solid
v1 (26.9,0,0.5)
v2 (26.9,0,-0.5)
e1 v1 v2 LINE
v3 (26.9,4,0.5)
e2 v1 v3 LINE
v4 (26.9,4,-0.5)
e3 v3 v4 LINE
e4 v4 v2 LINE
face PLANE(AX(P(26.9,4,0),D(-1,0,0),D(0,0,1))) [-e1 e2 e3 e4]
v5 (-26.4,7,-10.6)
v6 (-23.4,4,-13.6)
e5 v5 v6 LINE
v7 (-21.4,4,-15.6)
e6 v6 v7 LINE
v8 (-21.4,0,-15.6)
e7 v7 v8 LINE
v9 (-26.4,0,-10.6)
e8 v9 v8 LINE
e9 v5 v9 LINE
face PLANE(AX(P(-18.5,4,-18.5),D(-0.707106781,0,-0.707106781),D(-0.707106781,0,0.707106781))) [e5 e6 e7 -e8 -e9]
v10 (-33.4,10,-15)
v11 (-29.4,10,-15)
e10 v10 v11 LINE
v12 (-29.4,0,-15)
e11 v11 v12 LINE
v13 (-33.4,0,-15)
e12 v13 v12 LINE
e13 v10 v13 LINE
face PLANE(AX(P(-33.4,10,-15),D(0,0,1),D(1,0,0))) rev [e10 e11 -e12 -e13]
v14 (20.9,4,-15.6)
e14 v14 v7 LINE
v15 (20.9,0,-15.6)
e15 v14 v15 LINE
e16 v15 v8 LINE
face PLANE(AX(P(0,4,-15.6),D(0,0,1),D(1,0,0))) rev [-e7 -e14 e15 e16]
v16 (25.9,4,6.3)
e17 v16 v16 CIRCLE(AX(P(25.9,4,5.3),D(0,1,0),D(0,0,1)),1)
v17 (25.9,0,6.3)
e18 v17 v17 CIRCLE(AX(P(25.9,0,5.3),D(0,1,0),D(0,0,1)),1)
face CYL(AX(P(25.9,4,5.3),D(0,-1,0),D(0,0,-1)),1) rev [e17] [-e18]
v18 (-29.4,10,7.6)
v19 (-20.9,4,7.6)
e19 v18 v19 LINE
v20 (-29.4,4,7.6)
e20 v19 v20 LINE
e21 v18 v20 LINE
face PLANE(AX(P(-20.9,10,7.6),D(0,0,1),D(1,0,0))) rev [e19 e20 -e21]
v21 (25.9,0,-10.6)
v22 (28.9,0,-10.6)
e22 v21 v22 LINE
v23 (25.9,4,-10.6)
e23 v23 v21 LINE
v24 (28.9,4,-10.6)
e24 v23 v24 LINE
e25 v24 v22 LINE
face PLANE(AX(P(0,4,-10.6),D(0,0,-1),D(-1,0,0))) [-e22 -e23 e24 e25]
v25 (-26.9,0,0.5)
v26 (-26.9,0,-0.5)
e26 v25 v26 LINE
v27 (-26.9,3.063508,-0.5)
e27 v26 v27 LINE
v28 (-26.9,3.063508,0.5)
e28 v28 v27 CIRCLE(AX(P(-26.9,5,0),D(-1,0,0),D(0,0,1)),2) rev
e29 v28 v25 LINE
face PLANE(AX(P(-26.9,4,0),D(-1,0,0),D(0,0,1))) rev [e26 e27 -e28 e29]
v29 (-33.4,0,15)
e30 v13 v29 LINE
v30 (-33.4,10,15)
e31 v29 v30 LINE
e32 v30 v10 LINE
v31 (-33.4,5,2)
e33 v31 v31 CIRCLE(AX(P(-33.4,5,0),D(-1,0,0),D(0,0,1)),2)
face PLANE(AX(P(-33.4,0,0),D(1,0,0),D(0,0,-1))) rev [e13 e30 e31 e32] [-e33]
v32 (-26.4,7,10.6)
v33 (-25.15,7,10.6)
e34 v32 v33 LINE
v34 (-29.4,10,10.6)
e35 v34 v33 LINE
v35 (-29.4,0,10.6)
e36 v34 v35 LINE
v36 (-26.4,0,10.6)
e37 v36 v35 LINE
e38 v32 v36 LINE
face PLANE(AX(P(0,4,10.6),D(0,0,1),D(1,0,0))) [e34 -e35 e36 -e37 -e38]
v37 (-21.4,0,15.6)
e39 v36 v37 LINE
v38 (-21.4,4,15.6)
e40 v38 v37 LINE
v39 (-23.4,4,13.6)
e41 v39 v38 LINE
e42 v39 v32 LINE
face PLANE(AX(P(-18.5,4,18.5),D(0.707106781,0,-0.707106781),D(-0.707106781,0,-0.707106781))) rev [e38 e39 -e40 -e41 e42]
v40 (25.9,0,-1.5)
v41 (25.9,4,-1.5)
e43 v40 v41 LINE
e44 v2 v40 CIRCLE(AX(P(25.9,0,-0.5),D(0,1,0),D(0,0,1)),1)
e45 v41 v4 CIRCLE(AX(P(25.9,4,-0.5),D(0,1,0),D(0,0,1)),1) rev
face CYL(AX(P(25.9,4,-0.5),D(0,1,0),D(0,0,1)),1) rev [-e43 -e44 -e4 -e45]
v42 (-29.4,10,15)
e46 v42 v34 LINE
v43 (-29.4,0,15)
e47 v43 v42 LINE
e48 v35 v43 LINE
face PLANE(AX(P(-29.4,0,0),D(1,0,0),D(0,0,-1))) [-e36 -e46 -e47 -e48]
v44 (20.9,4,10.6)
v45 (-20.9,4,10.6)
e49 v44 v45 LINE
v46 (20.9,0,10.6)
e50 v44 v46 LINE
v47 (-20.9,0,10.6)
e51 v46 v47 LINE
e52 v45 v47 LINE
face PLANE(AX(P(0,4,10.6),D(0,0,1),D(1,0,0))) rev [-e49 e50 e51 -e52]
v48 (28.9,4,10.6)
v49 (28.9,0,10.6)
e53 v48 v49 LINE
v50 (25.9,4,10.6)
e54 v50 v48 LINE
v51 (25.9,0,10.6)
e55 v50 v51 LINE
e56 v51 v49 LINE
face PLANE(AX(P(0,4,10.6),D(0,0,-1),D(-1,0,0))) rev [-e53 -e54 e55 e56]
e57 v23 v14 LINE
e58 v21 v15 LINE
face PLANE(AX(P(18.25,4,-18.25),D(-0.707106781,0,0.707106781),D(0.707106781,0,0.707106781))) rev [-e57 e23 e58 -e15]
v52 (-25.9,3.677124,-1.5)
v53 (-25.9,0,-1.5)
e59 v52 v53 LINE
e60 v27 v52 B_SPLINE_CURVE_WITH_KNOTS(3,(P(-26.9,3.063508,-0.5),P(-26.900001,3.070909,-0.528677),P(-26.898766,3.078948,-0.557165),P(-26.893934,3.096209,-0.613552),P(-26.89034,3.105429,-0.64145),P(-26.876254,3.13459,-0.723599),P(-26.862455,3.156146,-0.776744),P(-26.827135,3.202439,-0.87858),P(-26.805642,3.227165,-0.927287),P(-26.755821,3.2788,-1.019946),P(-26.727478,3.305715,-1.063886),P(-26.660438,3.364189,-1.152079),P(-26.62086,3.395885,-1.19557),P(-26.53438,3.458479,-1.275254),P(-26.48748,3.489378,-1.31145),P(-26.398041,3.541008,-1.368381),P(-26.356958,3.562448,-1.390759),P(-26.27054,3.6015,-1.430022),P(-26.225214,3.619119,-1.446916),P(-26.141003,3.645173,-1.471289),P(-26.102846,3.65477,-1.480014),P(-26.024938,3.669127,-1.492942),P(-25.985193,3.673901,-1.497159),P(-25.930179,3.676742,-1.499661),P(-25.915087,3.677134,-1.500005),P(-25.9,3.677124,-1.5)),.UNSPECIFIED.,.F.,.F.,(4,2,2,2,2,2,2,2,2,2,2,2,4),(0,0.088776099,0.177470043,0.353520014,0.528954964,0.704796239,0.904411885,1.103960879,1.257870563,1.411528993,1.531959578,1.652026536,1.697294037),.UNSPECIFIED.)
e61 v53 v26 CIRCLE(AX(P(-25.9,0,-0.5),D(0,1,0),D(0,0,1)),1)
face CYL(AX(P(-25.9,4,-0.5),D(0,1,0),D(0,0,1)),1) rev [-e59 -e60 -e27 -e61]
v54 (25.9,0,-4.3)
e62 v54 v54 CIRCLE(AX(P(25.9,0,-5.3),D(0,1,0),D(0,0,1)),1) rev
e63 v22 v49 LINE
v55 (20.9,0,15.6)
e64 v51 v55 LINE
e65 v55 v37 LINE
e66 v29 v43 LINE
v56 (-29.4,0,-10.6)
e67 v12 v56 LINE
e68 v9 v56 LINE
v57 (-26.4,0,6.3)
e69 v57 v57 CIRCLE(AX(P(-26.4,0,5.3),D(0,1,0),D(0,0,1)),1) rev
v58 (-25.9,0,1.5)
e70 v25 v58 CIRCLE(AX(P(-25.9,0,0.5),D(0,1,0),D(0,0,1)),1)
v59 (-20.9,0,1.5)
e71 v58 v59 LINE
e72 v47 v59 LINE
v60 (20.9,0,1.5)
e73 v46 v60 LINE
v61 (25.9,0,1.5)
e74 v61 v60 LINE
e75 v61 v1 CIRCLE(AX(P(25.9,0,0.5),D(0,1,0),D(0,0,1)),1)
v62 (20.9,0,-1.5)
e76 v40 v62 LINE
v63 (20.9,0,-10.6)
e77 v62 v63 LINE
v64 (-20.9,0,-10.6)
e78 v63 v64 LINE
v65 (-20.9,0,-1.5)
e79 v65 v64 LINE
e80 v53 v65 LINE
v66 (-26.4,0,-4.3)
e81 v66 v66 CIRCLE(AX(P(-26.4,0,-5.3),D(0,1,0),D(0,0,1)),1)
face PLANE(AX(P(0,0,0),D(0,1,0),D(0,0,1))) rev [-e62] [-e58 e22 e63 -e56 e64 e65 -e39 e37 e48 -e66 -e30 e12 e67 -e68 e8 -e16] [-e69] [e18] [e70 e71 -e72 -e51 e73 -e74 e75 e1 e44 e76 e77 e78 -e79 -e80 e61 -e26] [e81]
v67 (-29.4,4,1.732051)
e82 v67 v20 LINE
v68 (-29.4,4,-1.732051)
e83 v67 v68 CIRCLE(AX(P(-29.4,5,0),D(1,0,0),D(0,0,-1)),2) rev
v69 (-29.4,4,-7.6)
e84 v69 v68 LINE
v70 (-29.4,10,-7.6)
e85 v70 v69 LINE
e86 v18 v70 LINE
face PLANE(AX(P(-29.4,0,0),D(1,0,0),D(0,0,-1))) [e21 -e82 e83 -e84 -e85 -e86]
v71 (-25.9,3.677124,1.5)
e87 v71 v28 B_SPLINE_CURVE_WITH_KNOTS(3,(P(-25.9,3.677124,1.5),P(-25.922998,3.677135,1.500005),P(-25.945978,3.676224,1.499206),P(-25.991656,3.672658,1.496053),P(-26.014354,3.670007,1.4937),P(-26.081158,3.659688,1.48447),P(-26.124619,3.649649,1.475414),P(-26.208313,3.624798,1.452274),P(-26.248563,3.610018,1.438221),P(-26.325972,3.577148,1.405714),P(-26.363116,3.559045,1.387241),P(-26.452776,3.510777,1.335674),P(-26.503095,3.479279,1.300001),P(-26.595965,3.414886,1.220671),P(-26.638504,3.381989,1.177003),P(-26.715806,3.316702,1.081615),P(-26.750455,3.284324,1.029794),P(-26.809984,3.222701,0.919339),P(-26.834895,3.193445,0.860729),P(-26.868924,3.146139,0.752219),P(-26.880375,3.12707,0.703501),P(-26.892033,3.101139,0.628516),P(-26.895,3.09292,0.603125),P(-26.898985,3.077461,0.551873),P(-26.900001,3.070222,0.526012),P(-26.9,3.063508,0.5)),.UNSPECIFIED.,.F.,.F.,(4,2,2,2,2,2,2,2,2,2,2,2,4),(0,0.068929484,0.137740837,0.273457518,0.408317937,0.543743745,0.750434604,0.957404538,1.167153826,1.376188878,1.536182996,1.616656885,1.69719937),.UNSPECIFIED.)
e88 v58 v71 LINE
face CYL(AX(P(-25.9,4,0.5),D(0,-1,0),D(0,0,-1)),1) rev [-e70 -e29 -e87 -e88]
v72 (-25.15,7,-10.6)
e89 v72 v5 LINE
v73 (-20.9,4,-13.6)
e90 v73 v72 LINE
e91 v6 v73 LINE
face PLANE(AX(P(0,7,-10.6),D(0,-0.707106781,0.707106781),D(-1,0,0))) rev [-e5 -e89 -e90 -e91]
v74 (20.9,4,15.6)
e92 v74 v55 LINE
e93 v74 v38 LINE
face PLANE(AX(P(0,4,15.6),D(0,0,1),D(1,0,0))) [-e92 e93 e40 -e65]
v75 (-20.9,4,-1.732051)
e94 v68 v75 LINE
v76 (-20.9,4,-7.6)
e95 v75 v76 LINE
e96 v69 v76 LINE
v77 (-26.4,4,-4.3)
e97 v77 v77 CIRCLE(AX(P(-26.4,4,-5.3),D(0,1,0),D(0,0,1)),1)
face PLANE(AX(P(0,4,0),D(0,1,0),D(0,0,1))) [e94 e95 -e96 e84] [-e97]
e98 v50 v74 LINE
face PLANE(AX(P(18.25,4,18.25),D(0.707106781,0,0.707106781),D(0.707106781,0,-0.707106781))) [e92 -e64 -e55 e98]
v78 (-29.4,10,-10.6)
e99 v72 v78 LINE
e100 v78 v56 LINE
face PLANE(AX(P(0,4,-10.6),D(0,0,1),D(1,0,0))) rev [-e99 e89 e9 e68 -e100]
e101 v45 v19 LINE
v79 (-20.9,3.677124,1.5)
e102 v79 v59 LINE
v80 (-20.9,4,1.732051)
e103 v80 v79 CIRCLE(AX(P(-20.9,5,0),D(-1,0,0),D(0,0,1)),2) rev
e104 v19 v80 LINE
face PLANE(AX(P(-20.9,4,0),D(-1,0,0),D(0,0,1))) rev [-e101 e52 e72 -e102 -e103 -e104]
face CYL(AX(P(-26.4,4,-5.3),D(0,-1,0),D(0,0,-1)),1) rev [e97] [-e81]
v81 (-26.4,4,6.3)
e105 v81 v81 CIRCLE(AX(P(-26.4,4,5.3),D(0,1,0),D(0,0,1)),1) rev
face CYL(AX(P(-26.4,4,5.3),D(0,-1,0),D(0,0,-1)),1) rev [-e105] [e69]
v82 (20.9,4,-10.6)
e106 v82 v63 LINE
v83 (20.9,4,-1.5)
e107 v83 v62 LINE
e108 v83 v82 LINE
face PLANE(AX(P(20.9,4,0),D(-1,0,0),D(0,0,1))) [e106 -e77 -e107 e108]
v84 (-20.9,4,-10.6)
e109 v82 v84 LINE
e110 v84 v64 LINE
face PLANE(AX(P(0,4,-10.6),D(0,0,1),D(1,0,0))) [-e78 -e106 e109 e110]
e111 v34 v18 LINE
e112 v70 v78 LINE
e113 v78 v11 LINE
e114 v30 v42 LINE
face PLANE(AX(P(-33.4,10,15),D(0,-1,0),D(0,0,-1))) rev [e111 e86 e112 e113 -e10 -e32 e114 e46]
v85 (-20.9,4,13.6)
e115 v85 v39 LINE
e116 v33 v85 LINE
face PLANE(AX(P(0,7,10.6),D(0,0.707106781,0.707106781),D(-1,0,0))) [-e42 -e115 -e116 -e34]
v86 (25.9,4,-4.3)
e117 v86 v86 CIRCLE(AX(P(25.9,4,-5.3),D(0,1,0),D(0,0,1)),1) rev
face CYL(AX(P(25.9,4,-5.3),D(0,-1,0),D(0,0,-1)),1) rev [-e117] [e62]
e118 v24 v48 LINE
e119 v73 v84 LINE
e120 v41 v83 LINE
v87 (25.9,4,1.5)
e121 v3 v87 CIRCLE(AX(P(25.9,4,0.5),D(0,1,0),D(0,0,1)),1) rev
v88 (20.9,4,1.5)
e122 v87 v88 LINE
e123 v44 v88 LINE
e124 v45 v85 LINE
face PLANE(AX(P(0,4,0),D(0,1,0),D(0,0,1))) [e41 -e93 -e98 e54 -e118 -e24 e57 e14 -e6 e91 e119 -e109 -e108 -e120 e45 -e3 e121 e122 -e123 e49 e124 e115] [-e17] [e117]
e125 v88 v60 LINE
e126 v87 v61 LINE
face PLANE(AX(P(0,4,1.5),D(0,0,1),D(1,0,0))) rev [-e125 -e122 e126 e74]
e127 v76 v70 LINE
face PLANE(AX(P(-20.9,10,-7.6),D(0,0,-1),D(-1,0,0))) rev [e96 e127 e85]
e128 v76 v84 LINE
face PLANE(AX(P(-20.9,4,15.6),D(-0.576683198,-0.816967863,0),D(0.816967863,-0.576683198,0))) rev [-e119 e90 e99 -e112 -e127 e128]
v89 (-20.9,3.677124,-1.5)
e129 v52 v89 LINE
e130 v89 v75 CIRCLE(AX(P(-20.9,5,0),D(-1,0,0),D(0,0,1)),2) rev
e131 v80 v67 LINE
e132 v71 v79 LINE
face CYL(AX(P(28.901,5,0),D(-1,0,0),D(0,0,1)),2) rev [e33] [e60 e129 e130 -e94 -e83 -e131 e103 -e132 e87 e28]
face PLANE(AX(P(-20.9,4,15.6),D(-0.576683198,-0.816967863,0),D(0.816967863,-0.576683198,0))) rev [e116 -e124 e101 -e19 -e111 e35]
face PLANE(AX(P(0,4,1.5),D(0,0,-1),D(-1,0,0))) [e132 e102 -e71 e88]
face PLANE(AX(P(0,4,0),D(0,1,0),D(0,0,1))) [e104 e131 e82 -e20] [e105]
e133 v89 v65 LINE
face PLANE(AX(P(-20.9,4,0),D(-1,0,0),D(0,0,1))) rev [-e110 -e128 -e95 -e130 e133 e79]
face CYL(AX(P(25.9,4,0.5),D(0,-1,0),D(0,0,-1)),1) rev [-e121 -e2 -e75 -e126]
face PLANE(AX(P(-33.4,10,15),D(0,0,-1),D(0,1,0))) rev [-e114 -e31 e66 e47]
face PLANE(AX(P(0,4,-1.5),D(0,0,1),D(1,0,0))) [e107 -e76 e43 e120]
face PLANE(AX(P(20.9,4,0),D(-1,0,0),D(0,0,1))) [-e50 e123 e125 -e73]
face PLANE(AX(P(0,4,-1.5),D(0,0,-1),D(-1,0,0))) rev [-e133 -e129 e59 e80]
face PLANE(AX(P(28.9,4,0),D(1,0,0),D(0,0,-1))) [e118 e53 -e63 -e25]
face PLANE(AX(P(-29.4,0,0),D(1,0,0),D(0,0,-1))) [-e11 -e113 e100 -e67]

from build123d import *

# Parameters (mm, degrees)
SKETCH1_R           = 1
BOSS_EXTRUDE1_DEPTH = 4
FILLET1_R           = 1
SKETCH2_W           = 30
SKETCH2_H           = 10
BOSS_EXTRUDE2_DEPTH = 4
SKETCH3_W           = 8.5
SKETCH3_H           = 3
BOSS_EXTRUDE3_DEPTH = 6
CUT_EXTRUDE1_DEPTH  = 44.611924975
CHAMFER3_SIZE       = 3
CUT_EXTRUDE2_REACH  = 66.997
SKETCH5_R           = 2


with BuildPart() as part:
    # Sketch1 → Boss-Extrude1 (new body)
    with BuildSketch(Plane(origin=(0, 0, 0), x_dir=(1, 0, 0), z_dir=(0, 1, 0))):
        Polygon((-21.4, 15.6), (-26.4, 10.6), (-29.4, 10.6), (-29.4, -10.6), (-26.4, -10.6), (-21.4, -15.6), (20.9, -15.6), (25.9, -10.6), (28.9, -10.6), (28.9, 10.6), (25.9, 10.6), (20.9, 15.6), align=None)
        Polygon((20.9, -1.5), (20.9, -10.6), (-20.9, -10.6), (-20.9, -1.5), (-26.9, -1.5), (-26.9, 1.5), (-20.9, 1.5), (-20.9, 10.6), (20.9, 10.6), (20.9, 1.5), (26.9, 1.5), (26.9, -1.5), align=None, mode=Mode.SUBTRACT)
        with Locations(Location((-26.4, 5.3, 0), (0, 0, 270))):
            Circle(SKETCH1_R, mode=Mode.SUBTRACT)
        with Locations(Location((-26.4, -5.3, 0), (0, 0, 270))):
            Circle(SKETCH1_R, mode=Mode.SUBTRACT)
        with Locations(Location((25.9, -5.3, 0), (0, 0, 270))):
            Circle(SKETCH1_R, mode=Mode.SUBTRACT)
        with Locations(Location((25.9, 5.3, 0), (0, 0, 270))):
            Circle(SKETCH1_R, mode=Mode.SUBTRACT)
    extrude(amount=BOSS_EXTRUDE1_DEPTH)

    # Fillet1
    fillet1_edges = [part.edges().sort_by_distance(p)[0] for p in [
        (26.9, 2, 1.5),
        (26.9, 2, -1.5),
        (-26.9, 2, -1.5),
        (-26.9, 2, 1.5),
    ]]
    fillet(fillet1_edges, radius=FILLET1_R)

    # Sketch2 → Boss-Extrude2 (add)
    with BuildSketch(Plane.ZY.offset(29.4)):
        with Locations((0, 5)):
            Rectangle(SKETCH2_W, SKETCH2_H)
    extrude(amount=BOSS_EXTRUDE2_DEPTH)

    # Sketch3 → Boss-Extrude3 (add)
    with BuildSketch(Plane(origin=(0, 4, 0), x_dir=(1, 0, 0), z_dir=(0, 1, 0))):
        with Locations((-25.15, -9.1)):
            Rectangle(SKETCH3_W, SKETCH3_H)
        with Locations((-25.15, 9.1)):
            Rectangle(SKETCH3_W, SKETCH3_H)
    extrude(amount=BOSS_EXTRUDE3_DEPTH)

    # Sketch4 → Cut-Extrude1 (cut, through all)
    with BuildSketch(Plane(origin=(0, 0, -10.6), x_dir=(-1, 0, 0), z_dir=(0, 0, -1))):
        Polygon((20.9, 4), (29.4, 10), (20.9, 10), align=None)
    extrude(amount=-CUT_EXTRUDE1_DEPTH, mode=Mode.SUBTRACT)

    # Chamfer3
    # the kernel refuses this chamfer: 3 mm, written as the material it adds along each edge
    with BuildSketch(Plane(origin=(-13.184951036, 4, 10.6), x_dir=(0, -0.02749587661058635, 0.9996219169112968), z_dir=(-1, 0, 0))) as chamfer3_piece_1_section:
        Polygon((CHAMFER3_SIZE * 0.999621916911, CHAMFER3_SIZE * 0.0274958766106), (-CHAMFER3_SIZE * 0.0274958766106, CHAMFER3_SIZE * 0.999621916911), (0, 0), align=None)
    chamfer3_piece_1 = extrude(amount=20.930097928, mode=Mode.PRIVATE)
    chamfer3_piece_1 = split(chamfer3_piece_1, bisect_by=Plane(origin=(-24.611993243, 4.851351351, 12.388006757), z_dir=(0.7071067811865483, 0, -0.7071067811865467)), keep=Keep.TOP, mode=Mode.PRIVATE)
    chamfer3_piece_1 = split(chamfer3_piece_1, bisect_by=Plane(origin=(-23.221105892, 5.638427689, 11.552702703), z_dir=(-0.5766831975986547, -0.8169678632647621, 0)), keep=Keep.TOP, mode=Mode.PRIVATE)
    add(chamfer3_piece_1)
    with BuildSketch(Plane(origin=(-13.184951036, 4, -10.6), x_dir=(-1.6712331566303747e-15, -0.02749587661058635, -0.9996219169112968), z_dir=(-1, 0, 0))) as chamfer3_piece_2_section:
        Polygon((CHAMFER3_SIZE * 0.999621916911, -CHAMFER3_SIZE * 0.0274958766106), (-CHAMFER3_SIZE * 0.0274958766106, -CHAMFER3_SIZE * 0.999621916911), (0, 0), align=None)
    chamfer3_piece_2 = extrude(amount=20.930097928, mode=Mode.PRIVATE)
    chamfer3_piece_2 = split(chamfer3_piece_2, bisect_by=Plane(origin=(-24.611993243, 4.851351351, -12.388006757), z_dir=(0.7071067811865487, 0, 0.7071067811865465)), keep=Keep.TOP, mode=Mode.PRIVATE)
    chamfer3_piece_2 = split(chamfer3_piece_2, bisect_by=Plane(origin=(-23.221105892, 5.638427689, -11.552702703), z_dir=(-0.5766831975986547, -0.8169678632647621, 0)), keep=Keep.TOP, mode=Mode.PRIVATE)
    add(chamfer3_piece_2)

    # Sketch5 → Cut-Extrude2 (cut, up to next)
    with BuildSketch(Plane.ZY.offset(33.4), mode=Mode.PRIVATE) as cut_extrude2_sk1:
        with Locations((0, 5)):
            Circle(SKETCH5_R)
    cut_extrude2_tool1 = extrude(cut_extrude2_sk1.sketch, amount=-CUT_EXTRUDE2_REACH, mode=Mode.PRIVATE) & part.part
    add(cut_extrude2_tool1.solids().sort_by_distance((-33.4, 5, 0))[0], mode=Mode.SUBTRACT)


solid = part.part
